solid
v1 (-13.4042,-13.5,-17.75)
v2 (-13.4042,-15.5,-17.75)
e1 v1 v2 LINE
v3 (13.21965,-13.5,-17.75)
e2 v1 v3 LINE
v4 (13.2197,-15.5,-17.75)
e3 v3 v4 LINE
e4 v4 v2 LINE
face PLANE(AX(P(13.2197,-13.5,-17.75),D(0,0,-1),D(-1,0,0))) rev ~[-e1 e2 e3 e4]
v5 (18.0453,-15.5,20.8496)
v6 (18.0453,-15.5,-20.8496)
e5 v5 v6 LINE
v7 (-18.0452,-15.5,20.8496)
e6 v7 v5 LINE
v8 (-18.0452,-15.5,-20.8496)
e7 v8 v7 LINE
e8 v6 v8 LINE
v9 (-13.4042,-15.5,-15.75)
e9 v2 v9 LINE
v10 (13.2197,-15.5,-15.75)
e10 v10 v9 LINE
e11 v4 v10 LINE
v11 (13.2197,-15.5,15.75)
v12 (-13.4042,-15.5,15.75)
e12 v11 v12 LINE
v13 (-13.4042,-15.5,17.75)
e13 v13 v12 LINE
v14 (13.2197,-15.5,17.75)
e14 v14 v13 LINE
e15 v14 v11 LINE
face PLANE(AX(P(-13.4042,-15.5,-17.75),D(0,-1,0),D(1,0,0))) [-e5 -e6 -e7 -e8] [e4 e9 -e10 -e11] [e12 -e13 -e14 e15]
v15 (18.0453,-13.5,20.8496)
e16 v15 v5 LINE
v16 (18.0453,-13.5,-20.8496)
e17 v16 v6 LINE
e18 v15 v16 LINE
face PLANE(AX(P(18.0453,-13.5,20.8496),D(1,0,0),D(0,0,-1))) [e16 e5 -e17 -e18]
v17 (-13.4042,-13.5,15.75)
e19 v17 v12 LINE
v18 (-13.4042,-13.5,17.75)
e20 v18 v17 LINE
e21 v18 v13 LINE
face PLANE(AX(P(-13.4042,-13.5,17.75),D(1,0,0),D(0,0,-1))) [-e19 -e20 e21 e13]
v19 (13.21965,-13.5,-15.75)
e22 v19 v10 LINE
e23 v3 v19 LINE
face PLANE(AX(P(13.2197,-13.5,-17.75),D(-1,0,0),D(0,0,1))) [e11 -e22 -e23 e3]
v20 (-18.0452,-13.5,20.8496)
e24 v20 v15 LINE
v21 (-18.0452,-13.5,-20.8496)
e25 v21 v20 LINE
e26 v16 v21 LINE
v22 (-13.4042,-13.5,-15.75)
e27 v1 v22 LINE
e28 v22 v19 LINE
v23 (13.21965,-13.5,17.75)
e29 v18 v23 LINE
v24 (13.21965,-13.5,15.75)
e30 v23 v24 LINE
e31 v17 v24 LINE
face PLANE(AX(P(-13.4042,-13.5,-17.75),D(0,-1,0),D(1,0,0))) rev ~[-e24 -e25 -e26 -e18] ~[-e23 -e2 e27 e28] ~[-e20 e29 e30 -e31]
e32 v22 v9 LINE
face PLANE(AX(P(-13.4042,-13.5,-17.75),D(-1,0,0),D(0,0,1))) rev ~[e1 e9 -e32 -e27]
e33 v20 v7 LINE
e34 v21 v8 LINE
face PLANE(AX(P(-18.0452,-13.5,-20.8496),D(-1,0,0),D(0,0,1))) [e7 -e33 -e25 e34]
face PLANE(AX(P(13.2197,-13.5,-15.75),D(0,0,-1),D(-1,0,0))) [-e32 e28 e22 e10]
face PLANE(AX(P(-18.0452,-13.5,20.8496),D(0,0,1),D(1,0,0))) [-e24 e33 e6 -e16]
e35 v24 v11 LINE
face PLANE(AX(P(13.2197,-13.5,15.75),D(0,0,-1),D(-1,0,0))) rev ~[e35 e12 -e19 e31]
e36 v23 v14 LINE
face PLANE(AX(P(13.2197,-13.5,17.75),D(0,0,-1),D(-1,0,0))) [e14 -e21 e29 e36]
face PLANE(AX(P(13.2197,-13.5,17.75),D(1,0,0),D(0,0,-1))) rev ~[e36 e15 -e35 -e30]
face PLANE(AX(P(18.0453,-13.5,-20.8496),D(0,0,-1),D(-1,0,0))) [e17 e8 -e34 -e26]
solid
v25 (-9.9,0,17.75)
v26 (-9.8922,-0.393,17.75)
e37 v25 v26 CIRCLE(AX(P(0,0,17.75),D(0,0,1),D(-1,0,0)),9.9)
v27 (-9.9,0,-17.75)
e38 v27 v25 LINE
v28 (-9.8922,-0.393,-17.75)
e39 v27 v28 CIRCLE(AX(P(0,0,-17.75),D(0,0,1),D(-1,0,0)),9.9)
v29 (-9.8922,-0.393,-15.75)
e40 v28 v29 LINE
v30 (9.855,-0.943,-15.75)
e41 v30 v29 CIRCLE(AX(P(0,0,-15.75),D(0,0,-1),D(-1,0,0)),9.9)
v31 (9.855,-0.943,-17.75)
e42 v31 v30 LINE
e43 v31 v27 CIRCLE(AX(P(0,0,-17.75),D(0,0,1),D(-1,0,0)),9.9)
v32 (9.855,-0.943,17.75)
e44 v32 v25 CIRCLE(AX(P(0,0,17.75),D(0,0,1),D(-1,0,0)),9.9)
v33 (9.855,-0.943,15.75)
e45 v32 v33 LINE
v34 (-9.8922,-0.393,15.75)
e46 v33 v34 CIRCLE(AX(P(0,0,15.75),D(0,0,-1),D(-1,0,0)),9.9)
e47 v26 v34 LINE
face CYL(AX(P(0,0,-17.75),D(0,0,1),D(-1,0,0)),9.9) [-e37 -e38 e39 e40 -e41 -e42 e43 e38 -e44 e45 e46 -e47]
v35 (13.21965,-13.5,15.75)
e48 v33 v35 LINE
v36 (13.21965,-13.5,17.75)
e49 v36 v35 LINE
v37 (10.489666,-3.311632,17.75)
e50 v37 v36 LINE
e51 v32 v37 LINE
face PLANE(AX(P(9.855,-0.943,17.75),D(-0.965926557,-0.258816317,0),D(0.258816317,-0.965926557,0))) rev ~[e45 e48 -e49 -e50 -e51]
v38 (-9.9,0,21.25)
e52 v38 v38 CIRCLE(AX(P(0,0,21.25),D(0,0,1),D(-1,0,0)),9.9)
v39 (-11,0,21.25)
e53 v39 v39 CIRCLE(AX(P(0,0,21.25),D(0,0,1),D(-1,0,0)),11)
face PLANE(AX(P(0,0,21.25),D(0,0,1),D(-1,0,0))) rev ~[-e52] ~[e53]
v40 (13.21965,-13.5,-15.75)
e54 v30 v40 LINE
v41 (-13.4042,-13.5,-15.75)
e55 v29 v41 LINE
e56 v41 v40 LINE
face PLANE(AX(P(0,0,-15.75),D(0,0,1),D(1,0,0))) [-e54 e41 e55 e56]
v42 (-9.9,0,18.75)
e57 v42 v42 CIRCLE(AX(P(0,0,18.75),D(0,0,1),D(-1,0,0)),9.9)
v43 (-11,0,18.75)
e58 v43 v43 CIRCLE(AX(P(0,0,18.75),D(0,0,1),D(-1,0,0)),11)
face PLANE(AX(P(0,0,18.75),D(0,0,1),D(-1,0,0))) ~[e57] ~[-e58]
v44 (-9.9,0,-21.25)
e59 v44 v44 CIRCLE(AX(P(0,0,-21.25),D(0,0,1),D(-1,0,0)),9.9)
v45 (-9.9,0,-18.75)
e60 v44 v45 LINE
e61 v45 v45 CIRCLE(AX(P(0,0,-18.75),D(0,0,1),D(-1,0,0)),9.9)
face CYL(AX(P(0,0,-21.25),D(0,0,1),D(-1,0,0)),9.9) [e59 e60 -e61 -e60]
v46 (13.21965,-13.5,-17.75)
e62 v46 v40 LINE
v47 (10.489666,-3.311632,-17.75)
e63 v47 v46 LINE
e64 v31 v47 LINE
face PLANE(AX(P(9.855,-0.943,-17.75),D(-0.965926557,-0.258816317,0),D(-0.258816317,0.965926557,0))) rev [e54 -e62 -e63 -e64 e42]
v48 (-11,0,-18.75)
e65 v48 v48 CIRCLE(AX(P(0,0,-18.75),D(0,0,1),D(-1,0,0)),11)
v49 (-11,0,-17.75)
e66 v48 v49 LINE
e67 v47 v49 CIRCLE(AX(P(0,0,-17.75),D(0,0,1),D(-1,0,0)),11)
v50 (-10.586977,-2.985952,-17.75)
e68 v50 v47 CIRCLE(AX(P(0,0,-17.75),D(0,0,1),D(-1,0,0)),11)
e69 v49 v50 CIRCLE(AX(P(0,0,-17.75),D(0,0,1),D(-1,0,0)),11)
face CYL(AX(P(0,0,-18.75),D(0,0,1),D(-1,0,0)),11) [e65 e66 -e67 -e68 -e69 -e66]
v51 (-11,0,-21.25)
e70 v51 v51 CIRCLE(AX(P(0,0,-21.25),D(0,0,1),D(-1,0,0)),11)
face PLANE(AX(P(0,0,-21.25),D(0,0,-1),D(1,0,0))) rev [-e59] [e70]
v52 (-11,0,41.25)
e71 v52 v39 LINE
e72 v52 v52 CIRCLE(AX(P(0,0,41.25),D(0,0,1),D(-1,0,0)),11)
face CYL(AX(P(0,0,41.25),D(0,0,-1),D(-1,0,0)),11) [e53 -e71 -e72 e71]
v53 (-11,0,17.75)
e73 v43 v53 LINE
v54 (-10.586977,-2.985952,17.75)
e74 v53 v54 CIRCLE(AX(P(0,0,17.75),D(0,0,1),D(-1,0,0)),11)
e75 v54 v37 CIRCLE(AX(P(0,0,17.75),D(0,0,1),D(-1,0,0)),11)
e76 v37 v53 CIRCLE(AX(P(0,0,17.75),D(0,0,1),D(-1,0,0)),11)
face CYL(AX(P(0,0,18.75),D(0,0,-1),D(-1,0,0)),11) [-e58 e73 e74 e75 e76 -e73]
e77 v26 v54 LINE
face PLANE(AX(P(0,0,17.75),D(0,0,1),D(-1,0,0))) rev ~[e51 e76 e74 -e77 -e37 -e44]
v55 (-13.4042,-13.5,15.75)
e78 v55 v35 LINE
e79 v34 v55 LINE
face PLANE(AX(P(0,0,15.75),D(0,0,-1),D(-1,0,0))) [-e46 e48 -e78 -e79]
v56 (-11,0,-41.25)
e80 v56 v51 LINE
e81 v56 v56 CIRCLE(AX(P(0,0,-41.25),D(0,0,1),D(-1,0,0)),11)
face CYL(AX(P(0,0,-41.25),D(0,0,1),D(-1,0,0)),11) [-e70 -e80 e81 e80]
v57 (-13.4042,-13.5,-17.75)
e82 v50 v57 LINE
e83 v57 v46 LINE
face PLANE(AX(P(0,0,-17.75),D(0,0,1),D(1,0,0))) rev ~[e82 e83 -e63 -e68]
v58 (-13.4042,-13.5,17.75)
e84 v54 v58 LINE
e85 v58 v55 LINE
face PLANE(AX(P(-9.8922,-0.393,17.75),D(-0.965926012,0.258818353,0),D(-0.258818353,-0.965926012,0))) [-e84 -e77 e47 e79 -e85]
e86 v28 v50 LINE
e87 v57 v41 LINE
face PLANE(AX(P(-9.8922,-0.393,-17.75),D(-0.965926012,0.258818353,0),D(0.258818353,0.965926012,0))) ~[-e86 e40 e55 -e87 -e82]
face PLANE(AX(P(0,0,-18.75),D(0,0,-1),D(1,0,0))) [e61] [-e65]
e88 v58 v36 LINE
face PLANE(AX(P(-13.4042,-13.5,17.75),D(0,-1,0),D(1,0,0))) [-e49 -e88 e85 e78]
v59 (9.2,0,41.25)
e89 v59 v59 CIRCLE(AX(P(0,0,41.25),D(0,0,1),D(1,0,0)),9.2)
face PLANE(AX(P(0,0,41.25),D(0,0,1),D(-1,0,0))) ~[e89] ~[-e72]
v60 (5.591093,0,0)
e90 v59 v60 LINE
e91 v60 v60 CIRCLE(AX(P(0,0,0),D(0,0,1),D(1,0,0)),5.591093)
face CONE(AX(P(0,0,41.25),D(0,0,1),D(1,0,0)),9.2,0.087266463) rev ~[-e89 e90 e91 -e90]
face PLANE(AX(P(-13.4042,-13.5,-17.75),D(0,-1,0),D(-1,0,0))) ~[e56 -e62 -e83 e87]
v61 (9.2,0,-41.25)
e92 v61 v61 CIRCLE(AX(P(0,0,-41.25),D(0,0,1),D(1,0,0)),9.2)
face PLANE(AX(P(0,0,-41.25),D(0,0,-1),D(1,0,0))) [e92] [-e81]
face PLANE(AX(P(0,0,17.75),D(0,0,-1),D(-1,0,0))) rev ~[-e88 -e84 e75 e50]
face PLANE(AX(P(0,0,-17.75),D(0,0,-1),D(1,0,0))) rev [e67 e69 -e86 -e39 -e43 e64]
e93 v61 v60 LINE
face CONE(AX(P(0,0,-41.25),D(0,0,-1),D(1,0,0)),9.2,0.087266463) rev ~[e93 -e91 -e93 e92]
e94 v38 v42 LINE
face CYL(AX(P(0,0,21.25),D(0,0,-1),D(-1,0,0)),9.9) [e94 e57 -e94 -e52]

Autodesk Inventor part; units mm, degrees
ref_plane "YZ Plane" through (0, 0, 0) normal (1, 0, 0) x (0, 1, 0)
ref_plane "XZ Plane" through (0, 0, 0) normal (0, 1, 0) x (-1, 0, 0)
ref_plane "XY Plane" through (0, 0, 0) normal (0, 0, 1) x (1, 0, 0)
sketch "Sketch1" plane through (0, 0, 0) normal (0, 1, 0) x (-1, 0, 0)
  line L0 (0, 0) -> (0, 21.25)
  line L1 (0, 21.25) -> (0, 41.25)
  line L2 (0, 41.25) -> (11, 41.25)
  line L3 (11, 41.25) -> (11, 21.25)
  line L4 (11, 21.25) -> (9.9, 21.25)
  line L5 (9.9, 21.25) -> (9.9, 18.75)
  line L6 (9.9, 18.75) -> (11, 18.75)
  line L7 (11, 18.75) -> (11, 17.75)
  line L8 (11, 17.75) -> (9.9, 17.75)
  line L9 (9.9, 17.75) -> (9.9, 0)
  line L10 (9.9, 0) -> (0, 0)
  dimension "d1" = 20
  dimension "d2" = 11
  dimension "d3" = 20
  dimension "d4" = 9.9
  dimension "d6" = 2.5
  dimension "d7" = 1
  dimension "d8" = 0
  dimension "d19" = 17.75
revolve "Revolution1" add sketch "Sketch1" angle 360 about axis through (0, 0, 21.25) along (0, 0, 1)
sketch "Sketch2" plane through (0, 0, 41.25) normal (0, 0, 1) x (1, 0, 0)
  circle A0 centre (0, 0) radius 11 projected
  circle A1 centre (0, 0) radius 9.2
  point P0 (0, 0)
  dimension "d20" = 1.8
extrude "Extrusion1" cut sketch "Sketch2" against normal through all draft -5 contours A1
mirror "Mirror1" about plane through (0, 0, 0) normal (0, 0, -1) of "Revolution1", "Extrusion1"
ref_plane "Work Plane1" through (0, 0, 0) normal (0, 0, -1) x (-1, 0, 0)
sketch "Sketch3" plane through (0, 0, 17.75) normal (0, 0, -1) x (-1, 0, 0)
  circle A0 centre (0, 0) radius 5.5911 projected
  circle A1 centre (0, 0) radius 9.2 projected
  circle A2 centre (0, 0) radius 9.9 projected
  line L0 (-9.855, -0.943) -> (-13.2196, -13.5)
  line L1 (-9.855, -0.943) -> (3.145, -0.943) construction
  line L2 (9.8922, -0.393) -> (13.4042, -13.5)
  line L3 (9.8922, -0.393) -> (23.4616, -0.393) construction
  line L4 (13.4042, -13.5) -> (-13.2196, -13.5)
  point P0 (0, 0)
  dimension "d12" = 13
  dimension "d13" = 105
  dimension "d14" = 75
  dimension "d21" = 13.5
extrude "Extrusion2" add sketch "Sketch3" along normal blind 2 contours A2 L2 L4 L0
mirror "Mirror2" about plane through (0, 0, 0) normal (0, 0, -1) of "Extrusion2"
sketch "Sketch4" plane through (-13.4042, -13.5, -17.75) normal (0, -1, 0) x (1, 0, 0)
  line L0 (26.6239, 0) -> (0, 0) projected
  line L1 (26.6239, 0) -> (26.6239, 2) projected
  line L2 (26.6239, 2) -> (0, 2) projected
  line L3 (0, 0) -> (0, 2) projected
  line L4 (26.6239, 35.5) -> (0, 35.5) projected
  line L5 (0, 35.5) -> (0, 33.5) projected
  line L6 (26.6239, 33.5) -> (0, 33.5) projected
  line L7 (26.6239, 35.5) -> (26.6239, 33.5) projected
  line L8 (31.4495, -3.0996) -> (-4.641, -3.0996)
  line L9 (-4.641, -3.0996) -> (-4.641, 38.5996)
  line L10 (-4.641, 38.5996) -> (31.4495, 38.5996)
  line L11 (31.4495, 38.5996) -> (31.4495, -3.0996)
  line L12 (31.4495, -3.0996) -> (-4.641, 38.5996) construction
  line L13 (-4.641, -3.0996) -> (31.4495, 38.5996) construction
  point P0 (13.4042, 17.75)
extrude "Extrusion3" add sketch "Sketch4" along normal blind 2
properties part number "00_Sensirion_Flowsensor"
